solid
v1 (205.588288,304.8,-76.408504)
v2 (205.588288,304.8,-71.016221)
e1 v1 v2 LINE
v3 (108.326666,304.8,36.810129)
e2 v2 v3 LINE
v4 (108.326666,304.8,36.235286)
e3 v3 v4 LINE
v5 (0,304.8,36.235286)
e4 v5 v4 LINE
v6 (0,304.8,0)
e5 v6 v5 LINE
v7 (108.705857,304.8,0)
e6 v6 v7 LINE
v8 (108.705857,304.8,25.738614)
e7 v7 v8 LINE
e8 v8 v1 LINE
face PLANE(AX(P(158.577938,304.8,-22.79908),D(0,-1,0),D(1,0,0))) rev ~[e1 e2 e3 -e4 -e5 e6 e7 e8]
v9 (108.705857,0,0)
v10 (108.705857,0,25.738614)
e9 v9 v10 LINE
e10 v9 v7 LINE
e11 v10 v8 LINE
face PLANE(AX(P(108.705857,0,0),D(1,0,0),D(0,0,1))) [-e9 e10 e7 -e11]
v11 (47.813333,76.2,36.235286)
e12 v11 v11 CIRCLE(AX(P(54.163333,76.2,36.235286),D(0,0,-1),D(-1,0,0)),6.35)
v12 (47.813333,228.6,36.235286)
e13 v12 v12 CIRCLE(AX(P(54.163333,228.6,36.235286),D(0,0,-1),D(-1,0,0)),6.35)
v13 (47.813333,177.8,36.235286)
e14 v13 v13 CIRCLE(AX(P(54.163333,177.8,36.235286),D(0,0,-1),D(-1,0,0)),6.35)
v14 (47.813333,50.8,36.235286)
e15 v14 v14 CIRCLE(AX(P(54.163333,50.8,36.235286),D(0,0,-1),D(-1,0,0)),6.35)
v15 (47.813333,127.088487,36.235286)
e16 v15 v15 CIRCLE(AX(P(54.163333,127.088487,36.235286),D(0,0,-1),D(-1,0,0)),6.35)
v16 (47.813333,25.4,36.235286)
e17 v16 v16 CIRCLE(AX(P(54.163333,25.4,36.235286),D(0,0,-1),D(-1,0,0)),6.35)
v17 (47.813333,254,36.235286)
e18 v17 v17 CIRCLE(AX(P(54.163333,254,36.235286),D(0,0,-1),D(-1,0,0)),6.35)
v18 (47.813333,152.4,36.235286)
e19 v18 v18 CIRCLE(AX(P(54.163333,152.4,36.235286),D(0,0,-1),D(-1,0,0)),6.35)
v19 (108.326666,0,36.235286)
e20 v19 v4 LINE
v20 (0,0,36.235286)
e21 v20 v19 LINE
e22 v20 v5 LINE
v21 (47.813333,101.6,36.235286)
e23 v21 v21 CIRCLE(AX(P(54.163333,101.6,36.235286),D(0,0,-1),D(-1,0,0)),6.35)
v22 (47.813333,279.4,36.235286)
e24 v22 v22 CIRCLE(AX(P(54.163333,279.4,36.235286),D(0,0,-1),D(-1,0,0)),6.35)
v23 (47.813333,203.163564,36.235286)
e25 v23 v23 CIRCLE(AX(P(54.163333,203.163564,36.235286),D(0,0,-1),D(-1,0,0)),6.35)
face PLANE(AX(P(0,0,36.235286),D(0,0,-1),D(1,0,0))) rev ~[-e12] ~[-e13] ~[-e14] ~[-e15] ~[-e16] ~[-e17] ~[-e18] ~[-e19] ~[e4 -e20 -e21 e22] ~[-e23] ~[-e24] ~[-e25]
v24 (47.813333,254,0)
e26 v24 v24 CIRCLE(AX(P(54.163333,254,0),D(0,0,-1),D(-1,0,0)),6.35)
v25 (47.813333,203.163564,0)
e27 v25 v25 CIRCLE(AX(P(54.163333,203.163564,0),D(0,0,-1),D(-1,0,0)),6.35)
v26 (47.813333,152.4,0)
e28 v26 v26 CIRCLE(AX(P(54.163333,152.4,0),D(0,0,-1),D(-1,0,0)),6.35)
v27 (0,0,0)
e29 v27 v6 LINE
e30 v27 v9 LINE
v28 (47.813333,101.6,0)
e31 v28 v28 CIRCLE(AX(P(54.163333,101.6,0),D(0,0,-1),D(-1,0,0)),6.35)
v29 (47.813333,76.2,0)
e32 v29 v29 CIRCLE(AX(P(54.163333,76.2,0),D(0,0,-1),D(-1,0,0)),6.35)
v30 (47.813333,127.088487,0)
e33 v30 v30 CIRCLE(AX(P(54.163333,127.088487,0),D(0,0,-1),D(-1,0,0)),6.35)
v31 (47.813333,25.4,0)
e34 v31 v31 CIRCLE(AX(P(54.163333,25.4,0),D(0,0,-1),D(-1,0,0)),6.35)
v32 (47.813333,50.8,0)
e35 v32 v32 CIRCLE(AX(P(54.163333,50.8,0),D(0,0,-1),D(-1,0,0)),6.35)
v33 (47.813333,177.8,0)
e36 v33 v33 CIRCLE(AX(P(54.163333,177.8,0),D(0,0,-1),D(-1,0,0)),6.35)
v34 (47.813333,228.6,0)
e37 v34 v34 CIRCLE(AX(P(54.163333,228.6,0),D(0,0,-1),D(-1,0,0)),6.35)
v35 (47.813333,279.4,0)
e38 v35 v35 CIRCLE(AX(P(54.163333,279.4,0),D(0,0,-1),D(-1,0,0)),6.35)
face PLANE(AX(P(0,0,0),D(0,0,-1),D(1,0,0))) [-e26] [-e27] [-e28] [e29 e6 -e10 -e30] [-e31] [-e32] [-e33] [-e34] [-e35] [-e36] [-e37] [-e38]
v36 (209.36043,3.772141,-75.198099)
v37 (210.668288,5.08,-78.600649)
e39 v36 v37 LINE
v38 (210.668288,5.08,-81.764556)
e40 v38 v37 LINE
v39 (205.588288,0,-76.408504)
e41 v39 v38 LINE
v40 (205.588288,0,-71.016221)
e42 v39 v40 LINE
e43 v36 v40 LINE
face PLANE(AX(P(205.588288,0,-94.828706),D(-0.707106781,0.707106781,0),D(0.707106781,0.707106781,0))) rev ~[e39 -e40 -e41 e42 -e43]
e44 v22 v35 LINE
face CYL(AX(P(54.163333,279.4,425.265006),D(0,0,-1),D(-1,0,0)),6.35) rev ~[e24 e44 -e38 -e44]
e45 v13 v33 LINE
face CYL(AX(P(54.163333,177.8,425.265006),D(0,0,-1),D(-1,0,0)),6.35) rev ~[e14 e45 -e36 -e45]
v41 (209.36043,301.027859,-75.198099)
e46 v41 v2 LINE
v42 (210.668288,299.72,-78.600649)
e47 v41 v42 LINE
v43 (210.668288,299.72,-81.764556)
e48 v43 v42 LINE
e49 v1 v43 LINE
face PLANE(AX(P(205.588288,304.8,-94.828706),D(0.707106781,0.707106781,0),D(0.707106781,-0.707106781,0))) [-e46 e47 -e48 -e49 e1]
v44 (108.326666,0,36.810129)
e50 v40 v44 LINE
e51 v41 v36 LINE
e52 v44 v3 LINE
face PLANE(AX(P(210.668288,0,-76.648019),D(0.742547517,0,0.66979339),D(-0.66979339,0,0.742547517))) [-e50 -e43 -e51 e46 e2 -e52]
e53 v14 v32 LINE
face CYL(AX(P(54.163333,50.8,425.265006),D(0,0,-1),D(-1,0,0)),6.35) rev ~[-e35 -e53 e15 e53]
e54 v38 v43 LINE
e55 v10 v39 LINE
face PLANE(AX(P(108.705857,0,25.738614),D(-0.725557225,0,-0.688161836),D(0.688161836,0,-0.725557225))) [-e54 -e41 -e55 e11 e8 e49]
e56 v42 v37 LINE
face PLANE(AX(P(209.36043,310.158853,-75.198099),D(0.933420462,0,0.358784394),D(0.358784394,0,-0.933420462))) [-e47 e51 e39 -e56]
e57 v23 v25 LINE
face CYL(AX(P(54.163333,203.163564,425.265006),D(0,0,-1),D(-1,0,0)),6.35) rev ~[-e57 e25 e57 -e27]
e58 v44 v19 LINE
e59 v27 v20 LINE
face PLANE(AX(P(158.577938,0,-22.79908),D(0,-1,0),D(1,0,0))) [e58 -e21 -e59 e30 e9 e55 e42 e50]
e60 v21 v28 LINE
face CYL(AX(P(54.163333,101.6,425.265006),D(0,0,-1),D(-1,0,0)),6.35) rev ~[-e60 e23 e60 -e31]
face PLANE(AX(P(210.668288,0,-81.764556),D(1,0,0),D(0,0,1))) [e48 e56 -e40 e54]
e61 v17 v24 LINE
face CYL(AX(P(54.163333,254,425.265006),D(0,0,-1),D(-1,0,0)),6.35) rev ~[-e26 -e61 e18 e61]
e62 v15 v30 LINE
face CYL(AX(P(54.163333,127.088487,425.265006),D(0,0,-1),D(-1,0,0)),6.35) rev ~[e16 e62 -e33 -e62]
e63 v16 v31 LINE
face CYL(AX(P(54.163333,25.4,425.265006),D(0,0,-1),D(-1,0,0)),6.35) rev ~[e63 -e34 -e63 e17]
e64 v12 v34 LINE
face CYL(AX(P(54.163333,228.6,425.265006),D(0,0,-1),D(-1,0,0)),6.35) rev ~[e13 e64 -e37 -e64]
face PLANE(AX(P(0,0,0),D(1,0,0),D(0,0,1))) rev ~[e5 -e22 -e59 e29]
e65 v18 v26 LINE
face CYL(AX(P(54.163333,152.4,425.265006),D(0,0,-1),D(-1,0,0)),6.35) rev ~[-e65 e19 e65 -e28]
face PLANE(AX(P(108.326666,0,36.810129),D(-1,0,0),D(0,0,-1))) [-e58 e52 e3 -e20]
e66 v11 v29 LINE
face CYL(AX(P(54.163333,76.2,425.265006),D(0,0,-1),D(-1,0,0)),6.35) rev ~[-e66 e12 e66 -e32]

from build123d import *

# Parameters (mm, degrees)
F0_W        = 108.7058566231
F0_H        = 36.235285541
F1_DEPTH    = 304.8
F3_DEPTH    = 304.8
F4_T1_DEPTH = 31.2448363711
F4_T3_DEPTH = 315.5177056065
F6_D        = 12.7


# Not quite as in the source:
# - a fillet or chamfer that OpenCascade refuses, or shapes differently, is made with other operations: its cross-section is extruded or revolved along the edge and cut away or added
# - a feature names something its author has since deleted; it is built from what else it names


with BuildPart() as f1:
    # F0 (on Front) → F1 (new body)
    with BuildSketch(Plane.XZ):
        with Locations((54.3529283115, 18.1176427705)):
            Rectangle(F0_W, F0_H)
    extrude(amount=-F1_DEPTH)

    # F2 (on face) → F3 (join)
    with BuildSketch(Plane.XZ):
        Polygon((210.6682882407, -76.6480192542), (108.3266659877, 36.8101285866), (108.3266659877, 36.235285541), (108.7058566231, 36.235285541), (108.7058566231, 25.7386137456), (210.6682882407, -81.7645564675), align=None)
    extrude(amount=-F3_DEPTH)

    # F4: chamfer of 5.08 on 3 edges, made by hand

    # F4_s2 → F4_t1 (cut)
    with BuildSketch(Plane.XY.offset(-94.8287060464)):
        Polygon((205.5882882407, 0), (210.6682882407, 5.08), (210.6682882407, 0), align=None)
        Polygon((205.5882882407, 304.8), (210.6682882407, 299.72), (210.6682882407, 304.8), align=None)
    extrude(amount=F4_T1_DEPTH, mode=Mode.SUBTRACT)

    # F4_s4 → F4_t3 (cut)
    with BuildSketch(Plane.XZ.offset(-310.1588528033)):
        Polygon((209.3604296259, -75.1980987546), (210.6682882407, -78.6006491759), (210.6682882407, -76.6480192542), align=None)
    extrude(amount=F4_T3_DEPTH, mode=Mode.SUBTRACT)

    # F6 (through all)
    with Locations(Plane.XY.offset(36.235285541)):
        with Locations((54.1633329939, 228.6), (54.1633329939, 152.4), (54.1633329939, 279.4), (54.1633329939, 254), (54.1633329939, 177.8), (54.1633329939, 203.1635642052), (54.1633329939, 127.0884871483), (54.1633329939, 101.6), (54.1633329939, 50.8), (54.1633329939, 25.4), (54.1633329939, 76.2)):
            Hole(F6_D / 2)


solid = f1.part
